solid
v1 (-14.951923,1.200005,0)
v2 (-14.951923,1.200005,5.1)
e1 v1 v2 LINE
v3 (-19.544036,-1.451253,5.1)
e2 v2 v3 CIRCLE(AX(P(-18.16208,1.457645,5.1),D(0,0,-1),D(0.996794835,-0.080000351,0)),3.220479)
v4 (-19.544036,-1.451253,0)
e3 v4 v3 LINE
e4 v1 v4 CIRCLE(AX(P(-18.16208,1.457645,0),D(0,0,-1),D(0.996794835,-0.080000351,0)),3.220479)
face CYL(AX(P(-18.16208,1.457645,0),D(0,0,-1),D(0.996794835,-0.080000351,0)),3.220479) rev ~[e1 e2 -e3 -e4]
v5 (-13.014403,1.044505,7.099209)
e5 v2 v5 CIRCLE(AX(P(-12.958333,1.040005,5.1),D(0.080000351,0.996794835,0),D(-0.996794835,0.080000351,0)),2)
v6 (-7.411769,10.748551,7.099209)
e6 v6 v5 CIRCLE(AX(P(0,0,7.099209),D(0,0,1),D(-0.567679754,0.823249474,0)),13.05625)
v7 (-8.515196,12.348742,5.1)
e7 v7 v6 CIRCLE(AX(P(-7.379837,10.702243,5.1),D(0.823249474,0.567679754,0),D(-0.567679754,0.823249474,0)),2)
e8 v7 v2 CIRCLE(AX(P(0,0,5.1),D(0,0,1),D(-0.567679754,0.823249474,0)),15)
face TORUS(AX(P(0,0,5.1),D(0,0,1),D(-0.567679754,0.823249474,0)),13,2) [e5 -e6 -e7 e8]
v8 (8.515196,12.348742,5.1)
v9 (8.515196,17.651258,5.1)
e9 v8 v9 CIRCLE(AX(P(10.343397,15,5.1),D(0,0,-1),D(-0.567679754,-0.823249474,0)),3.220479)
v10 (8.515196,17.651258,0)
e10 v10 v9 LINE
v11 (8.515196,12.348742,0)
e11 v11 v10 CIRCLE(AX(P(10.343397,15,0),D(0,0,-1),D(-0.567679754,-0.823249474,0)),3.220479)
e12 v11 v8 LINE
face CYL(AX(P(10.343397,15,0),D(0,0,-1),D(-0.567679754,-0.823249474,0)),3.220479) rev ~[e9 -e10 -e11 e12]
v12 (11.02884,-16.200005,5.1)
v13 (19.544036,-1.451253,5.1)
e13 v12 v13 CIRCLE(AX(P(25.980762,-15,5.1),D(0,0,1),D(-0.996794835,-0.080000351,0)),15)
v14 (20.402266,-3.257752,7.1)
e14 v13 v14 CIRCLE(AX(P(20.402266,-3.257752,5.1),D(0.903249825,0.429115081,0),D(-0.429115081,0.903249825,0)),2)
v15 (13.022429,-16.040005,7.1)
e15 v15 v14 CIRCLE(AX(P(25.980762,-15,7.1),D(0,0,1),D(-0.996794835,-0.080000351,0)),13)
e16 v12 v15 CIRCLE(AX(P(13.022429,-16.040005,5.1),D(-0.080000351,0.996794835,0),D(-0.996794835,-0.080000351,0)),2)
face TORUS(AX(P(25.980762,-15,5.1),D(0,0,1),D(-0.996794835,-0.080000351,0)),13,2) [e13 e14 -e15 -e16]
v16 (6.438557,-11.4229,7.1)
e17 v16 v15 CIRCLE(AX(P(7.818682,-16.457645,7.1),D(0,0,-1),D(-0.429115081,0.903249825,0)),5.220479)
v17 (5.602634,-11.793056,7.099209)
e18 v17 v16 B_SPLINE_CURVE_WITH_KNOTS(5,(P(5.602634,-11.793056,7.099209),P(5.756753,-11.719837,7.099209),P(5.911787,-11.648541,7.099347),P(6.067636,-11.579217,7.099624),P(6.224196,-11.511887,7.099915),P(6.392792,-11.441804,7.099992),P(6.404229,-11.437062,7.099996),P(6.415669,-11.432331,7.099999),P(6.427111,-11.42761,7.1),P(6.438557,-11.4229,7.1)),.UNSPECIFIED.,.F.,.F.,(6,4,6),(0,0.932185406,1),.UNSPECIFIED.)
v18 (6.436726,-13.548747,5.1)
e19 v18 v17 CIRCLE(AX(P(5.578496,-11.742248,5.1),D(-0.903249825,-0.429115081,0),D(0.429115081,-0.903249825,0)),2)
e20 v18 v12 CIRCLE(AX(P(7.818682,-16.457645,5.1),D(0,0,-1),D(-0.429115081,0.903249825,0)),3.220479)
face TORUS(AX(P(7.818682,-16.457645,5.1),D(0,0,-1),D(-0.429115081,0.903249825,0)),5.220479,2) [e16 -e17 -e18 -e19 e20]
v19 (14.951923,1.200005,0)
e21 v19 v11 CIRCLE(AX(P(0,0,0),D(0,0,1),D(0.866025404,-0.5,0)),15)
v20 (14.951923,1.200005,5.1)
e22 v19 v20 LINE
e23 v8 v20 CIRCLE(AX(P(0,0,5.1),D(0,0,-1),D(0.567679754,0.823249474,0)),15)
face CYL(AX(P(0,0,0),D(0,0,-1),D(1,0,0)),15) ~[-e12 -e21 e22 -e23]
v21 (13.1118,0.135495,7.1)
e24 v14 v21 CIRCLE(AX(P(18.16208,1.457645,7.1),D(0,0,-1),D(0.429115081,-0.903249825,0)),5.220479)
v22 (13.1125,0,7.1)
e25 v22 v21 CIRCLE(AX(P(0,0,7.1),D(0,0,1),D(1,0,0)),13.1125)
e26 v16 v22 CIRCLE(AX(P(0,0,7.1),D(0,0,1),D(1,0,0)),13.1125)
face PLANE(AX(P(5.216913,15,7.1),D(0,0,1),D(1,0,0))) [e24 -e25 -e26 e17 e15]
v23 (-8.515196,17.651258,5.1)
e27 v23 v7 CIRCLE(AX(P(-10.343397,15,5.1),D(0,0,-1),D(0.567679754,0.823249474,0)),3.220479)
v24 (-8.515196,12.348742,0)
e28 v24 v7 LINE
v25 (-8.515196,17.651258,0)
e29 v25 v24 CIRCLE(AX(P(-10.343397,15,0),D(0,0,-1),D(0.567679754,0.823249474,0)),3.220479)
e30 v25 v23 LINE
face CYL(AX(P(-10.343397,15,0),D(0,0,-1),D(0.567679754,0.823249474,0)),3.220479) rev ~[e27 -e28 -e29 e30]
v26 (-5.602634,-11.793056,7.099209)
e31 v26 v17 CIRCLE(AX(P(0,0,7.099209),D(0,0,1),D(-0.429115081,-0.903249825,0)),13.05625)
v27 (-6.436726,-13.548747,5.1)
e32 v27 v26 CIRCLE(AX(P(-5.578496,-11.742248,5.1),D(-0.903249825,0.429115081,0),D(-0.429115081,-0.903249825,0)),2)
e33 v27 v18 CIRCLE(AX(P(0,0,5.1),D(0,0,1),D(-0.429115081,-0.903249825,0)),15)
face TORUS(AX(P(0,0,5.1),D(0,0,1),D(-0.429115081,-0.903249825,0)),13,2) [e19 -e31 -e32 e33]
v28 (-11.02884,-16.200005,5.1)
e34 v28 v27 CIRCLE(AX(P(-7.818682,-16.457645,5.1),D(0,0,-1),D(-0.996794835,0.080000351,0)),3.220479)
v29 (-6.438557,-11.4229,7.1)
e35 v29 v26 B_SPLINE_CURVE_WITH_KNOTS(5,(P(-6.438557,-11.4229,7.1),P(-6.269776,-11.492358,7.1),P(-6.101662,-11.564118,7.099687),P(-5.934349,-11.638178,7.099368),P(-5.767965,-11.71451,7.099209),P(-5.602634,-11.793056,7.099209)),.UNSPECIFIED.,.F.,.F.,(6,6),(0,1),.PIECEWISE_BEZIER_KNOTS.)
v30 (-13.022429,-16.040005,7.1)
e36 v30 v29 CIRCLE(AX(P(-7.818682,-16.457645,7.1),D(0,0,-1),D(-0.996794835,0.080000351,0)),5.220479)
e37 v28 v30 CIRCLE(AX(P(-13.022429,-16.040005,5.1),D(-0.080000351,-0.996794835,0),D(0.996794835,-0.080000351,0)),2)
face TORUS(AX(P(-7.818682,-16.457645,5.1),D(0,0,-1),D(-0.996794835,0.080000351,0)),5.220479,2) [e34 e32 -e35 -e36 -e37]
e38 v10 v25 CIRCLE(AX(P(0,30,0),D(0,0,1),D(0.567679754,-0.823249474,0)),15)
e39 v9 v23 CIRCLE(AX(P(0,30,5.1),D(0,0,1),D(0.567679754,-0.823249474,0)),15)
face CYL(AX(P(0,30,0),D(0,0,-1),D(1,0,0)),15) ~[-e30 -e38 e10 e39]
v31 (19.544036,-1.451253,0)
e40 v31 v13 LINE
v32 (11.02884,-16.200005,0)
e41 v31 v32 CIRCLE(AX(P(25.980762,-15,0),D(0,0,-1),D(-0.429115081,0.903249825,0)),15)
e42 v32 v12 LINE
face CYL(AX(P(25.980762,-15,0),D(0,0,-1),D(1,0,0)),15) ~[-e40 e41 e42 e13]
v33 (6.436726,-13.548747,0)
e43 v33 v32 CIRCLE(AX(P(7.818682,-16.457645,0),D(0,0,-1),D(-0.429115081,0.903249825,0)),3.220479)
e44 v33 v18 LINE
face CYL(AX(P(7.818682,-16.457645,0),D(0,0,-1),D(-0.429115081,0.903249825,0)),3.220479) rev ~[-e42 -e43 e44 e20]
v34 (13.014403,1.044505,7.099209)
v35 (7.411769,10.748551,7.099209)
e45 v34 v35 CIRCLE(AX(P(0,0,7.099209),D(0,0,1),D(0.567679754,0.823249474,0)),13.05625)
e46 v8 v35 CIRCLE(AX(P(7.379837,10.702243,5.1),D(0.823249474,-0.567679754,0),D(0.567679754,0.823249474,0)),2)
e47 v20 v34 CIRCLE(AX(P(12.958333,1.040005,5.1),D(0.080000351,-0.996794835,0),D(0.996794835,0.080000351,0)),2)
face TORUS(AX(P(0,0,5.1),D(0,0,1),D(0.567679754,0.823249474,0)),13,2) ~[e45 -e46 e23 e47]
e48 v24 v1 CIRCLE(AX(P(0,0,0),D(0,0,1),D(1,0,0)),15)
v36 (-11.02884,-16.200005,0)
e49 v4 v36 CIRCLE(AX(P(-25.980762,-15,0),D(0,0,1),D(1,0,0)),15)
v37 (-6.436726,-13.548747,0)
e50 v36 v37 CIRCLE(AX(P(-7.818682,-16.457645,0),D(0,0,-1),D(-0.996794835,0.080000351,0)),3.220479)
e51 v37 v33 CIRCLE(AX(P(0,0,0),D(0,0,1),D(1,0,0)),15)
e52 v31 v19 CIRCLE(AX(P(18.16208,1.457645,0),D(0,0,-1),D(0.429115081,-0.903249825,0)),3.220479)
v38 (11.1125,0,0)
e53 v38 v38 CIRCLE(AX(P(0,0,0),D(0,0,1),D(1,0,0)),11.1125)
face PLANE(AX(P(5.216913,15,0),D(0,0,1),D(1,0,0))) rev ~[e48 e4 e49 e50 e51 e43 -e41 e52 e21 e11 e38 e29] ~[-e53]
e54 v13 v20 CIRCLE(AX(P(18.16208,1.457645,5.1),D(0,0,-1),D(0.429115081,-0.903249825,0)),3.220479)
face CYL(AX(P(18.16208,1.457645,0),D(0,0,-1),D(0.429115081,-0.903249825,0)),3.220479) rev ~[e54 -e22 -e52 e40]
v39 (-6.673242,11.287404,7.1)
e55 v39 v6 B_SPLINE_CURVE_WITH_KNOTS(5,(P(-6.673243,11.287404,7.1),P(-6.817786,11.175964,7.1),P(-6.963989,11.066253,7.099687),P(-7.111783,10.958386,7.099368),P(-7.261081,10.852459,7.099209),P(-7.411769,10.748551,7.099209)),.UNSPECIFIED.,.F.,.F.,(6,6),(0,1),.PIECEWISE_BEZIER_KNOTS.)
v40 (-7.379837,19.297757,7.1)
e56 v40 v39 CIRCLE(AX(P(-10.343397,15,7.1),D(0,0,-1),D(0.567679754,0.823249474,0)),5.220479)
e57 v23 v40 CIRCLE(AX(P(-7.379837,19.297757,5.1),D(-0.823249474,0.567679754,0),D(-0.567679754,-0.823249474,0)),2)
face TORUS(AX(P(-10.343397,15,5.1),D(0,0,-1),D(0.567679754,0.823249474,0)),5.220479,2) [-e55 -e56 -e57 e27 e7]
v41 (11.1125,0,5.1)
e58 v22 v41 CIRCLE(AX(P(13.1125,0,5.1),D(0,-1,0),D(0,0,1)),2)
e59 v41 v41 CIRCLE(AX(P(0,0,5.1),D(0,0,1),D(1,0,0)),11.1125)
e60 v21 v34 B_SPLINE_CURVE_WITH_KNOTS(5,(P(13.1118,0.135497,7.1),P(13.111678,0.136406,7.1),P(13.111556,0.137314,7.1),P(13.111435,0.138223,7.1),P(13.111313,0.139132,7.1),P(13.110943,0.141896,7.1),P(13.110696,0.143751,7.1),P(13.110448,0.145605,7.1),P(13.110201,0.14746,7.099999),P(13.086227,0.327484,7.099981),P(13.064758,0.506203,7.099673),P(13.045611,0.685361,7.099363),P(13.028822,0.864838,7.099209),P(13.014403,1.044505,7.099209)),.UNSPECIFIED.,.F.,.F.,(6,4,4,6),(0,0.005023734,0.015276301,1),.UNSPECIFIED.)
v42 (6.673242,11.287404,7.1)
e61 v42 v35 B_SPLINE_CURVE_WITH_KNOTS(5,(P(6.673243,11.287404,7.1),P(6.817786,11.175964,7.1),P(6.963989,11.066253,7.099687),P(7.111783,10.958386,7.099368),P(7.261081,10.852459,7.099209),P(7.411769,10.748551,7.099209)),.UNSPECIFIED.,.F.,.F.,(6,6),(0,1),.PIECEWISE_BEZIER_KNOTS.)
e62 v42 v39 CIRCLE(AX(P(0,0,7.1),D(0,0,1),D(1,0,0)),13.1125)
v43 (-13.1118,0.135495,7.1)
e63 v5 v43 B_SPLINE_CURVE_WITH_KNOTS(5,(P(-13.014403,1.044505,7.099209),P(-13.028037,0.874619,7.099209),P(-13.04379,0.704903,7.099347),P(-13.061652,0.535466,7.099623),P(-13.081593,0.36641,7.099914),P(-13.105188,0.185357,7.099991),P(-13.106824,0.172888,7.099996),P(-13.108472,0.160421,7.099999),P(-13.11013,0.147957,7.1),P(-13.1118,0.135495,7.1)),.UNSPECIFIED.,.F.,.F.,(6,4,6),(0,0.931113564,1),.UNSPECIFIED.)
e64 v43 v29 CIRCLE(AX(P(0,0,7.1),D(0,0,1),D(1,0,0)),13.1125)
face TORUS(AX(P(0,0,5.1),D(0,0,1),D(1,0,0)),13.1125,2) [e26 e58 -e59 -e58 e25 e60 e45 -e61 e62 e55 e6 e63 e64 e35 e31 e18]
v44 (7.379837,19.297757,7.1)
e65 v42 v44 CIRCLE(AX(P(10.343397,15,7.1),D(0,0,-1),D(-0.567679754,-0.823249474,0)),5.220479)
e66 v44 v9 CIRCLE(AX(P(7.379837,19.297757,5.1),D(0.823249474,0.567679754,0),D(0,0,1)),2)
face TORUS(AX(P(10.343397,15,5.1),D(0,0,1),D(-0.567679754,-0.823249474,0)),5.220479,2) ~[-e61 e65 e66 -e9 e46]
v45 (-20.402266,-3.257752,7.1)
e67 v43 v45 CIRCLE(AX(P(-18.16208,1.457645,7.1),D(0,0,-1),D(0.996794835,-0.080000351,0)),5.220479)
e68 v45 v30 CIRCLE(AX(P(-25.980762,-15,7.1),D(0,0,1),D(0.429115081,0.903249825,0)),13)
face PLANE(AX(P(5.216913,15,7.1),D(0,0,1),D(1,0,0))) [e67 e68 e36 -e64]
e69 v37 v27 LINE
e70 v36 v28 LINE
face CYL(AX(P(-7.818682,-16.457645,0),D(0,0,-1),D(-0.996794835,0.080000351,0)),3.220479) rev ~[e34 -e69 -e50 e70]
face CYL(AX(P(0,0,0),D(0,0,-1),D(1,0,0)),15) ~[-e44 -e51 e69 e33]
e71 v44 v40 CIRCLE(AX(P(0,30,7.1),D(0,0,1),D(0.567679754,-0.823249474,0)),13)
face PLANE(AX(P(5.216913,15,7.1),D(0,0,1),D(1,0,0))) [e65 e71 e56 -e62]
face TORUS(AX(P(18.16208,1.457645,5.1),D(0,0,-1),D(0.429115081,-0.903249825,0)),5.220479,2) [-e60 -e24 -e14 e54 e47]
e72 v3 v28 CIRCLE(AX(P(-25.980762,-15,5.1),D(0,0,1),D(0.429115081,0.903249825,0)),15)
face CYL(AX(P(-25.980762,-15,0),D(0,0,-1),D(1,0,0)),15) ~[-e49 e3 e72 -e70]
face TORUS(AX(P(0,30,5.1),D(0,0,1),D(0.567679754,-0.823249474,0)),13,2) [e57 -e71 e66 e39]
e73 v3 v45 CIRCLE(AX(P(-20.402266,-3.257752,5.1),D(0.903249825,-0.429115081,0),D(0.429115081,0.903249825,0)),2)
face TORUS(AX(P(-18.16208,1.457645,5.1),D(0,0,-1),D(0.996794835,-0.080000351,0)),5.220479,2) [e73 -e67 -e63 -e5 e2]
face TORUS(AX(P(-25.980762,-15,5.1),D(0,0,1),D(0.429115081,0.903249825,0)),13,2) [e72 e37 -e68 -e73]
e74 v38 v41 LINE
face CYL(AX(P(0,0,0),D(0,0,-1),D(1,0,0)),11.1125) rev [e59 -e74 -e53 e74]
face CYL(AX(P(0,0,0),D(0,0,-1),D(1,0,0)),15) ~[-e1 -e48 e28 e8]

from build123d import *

# Parameters (mm, degrees)
F0_R         = 15
F0_R_2       = 11.1125
F1_DEPTH     = 7.1
F2_R         = 15
F3_DEPTH     = 7.1
F5_DEPTH     = 7.1
F6_T2_ANGLE  = 50.822828172
F6_T4_ANGLE  = 110.822828172
F6_T6_ANGLE  = 290.822828172
F6_T8_ANGLE  = 110.822828172
F6_T10_ANGLE = 50.822828172
F6_T12_ANGLE = 110.822828172
F6_T14_ANGLE = 290.822828172
F6_T16_ANGLE = 110.822828172
F6_T18_ANGLE = 50.822828172
F6_T20_ANGLE = 110.822828172
F6_T22_ANGLE = 290.822828172
F6_T24_ANGLE = 110.822828172


# Not quite as in the source:
# - a fillet or chamfer that OpenCascade refuses, or shapes differently, is made with other operations: its cross-section is extruded or revolved along the edge and cut away or added


with BuildPart() as f1:
    # F0 (on Top) → F1 (new body)
    with BuildSketch(Plane.XY):
        Circle(F0_R)
        Circle(F0_R_2, mode=Mode.SUBTRACT)
    extrude(amount=F1_DEPTH)

    # F2 (on Top) → F3 (join)
    with BuildSketch(Plane.XY):
        with Locations((0, 30)):
            Circle(F2_R)
        with Locations((-25.9807621135, -15)):
            Circle(F2_R)
        with Locations((25.9807621135, -15)):
            Circle(F2_R)
    extrude(amount=F3_DEPTH)

    # F4 (on Top) → F5 (join)
    with BuildSketch(Plane.XY):
        with BuildLine():
            ThreePointArc((8.5151963101, 17.6512578859), (4.459196579, 15.6781437701), (-3.4e-09, 15))
            ThreePointArc((-3.4e-09, 15), (4.459196579, 14.3218562299), (8.5151963101, 12.3487421141))
            ThreePointArc((8.5151963101, 12.3487421141), (7.1229179094, 15), (8.5151963101, 17.6512578859))
        make_face()
        with BuildLine():
            ThreePointArc((-8.5151963101, 17.6512578859), (-7.1229179094, 15), (-8.5151963101, 12.3487421141))
            ThreePointArc((-8.5151963101, 12.3487421141), (-4.4591965822, 14.3218562289), (-3.4e-09, 15))
            ThreePointArc((-3.4e-09, 15), (-4.4591965822, 15.6781437711), (-8.5151963101, 17.6512578859))
        make_face()
        with BuildLine():
            ThreePointArc((-12.9903811554, -7.4999998292), (-14.632689636, -3.2991504992), (-14.9519225306, 1.2000052657))
            ThreePointArc((-14.9519225306, 1.2000052657), (-16.5518400115, -1.3313721414), (-19.544035893, -1.4512526202))
            ThreePointArc((-19.544035893, -1.4512526202), (-15.8072691523, -3.9772942992), (-12.9903811554, -7.4999998292))
        make_face()
        with BuildLine():
            ThreePointArc((-6.4367262205, -13.5487473798), (-10.1734931062, -11.0227055671), (-12.9903811554, -7.4999998292))
            ThreePointArc((-12.9903811554, -7.4999998292), (-11.3480725209, -11.7008493083), (-11.0288395829, -16.2000052657))
            ThreePointArc((-11.0288395829, -16.2000052657), (-9.4289221021, -13.6686278586), (-6.4367262205, -13.5487473798))
        make_face()
        with BuildLine():
            ThreePointArc((12.9903809901, -7.5000001155), (10.1734929847, -11.0227056792), (6.4367262205, -13.5487473798))
            ThreePointArc((6.4367262205, -13.5487473798), (9.4289221021, -13.6686278586), (11.0288395829, -16.2000052657))
            ThreePointArc((11.0288395829, -16.2000052657), (11.3480724846, -11.7008494696), (12.9903809901, -7.5000001155))
        make_face()
        with BuildLine():
            ThreePointArc((14.9519225306, 1.2000052657), (14.6326895996, -3.2991506605), (12.9903809901, -7.5000001155))
            ThreePointArc((12.9903809901, -7.5000001155), (15.8072690308, -3.9772944113), (19.544035893, -1.4512526202))
            ThreePointArc((19.544035893, -1.4512526202), (16.5518400115, -1.3313721414), (14.9519225306, 1.2000052657))
        make_face()
    extrude(amount=F5_DEPTH)

    # F6: fillet of radius 2 on 13 edges, made by hand

    # F6_s1 → F6_t2 (revolve, cut)
    with BuildSketch(Plane(origin=(0, 0, 0), x_dir=(0, 0, 1), z_dir=(-0.8232494743, 0.567679754, 0))):
        with BuildLine():
            ThreePointArc((5.1, 15), (6.5142135624, 14.4142135624), (7.1, 13))
            Line((7.1, 13), (7.1, 15))
            Line((7.1, 15), (5.1, 15))
        make_face()
    revolve(axis=Axis((0, 0, 7.1), (0, 0, -1)), revolution_arc=F6_T2_ANGLE, mode=Mode.SUBTRACT)

    # F6_s3 → F6_t4 (revolve, cut)
    with BuildSketch(Plane(origin=(0, 0, 0), x_dir=(0, 0, 1), z_dir=(0.8232494743, -0.567679754, 0))):
        with BuildLine():
            ThreePointArc((7.1, -13), (6.5142135624, -14.4142135624), (5.1, -15))
            Line((5.1, -15), (7.1, -15))
            Line((7.1, -15), (7.1, -13))
        make_face()
    revolve(axis=Axis((10.3433972036, 15, 7.1), (0, 0, -1)), revolution_arc=F6_T4_ANGLE, mode=Mode.SUBTRACT)

    # F6_s5 → F6_t6 (revolve, cut)
    with BuildSketch(Plane(origin=(14.0202617712, 9.6678090933, 0), x_dir=(0, 0, 1), z_dir=(-0.8232494743, -0.567679754, 0))):
        with BuildLine():
            ThreePointArc((5.1, 9.6974842282), (6.5142135624, 10.2832706658), (7.1, 11.6974842282))
            Line((7.1, 11.6974842282), (7.1, 9.6974842282))
            Line((7.1, 9.6974842282), (5.1, 9.6974842282))
        make_face()
    revolve(axis=Axis((0, 30, 7.1), (0, 0, 1)), revolution_arc=F6_T6_ANGLE, mode=Mode.SUBTRACT)

    # F6_s7 → F6_t8 (revolve, cut)
    with BuildSketch(Plane(origin=(-14.0202617712, 9.6678090933, 0), x_dir=(0, 0, 1), z_dir=(-0.8232494743, 0.567679754, 0))):
        with BuildLine():
            ThreePointArc((5.1, 9.6974842282), (6.5142135624, 10.2832706658), (7.1, 11.6974842282))
            Line((7.1, 11.6974842282), (7.1, 9.6974842282))
            Line((7.1, 9.6974842282), (5.1, 9.6974842282))
        make_face()
    revolve(axis=Axis((-10.3433972036, 15, 7.1), (0, 0, -1)), revolution_arc=F6_T8_ANGLE, mode=Mode.SUBTRACT)

    # F6_s9 → F6_t10 (revolve, cut)
    with BuildSketch(Plane(origin=(0, 0, 0), x_dir=(0, 0, 1), z_dir=(0.8232494743, 0.567679754, 0))):
        with BuildLine():
            ThreePointArc((5.1, -15), (6.5142135624, -14.4142135624), (7.1, -13))
            Line((7.1, -13), (7.1, -15))
            Line((7.1, -15), (5.1, -15))
        make_face()
    revolve(axis=Axis((0, 0, 7.1), (0, 0, 1)), revolution_arc=F6_T10_ANGLE, mode=Mode.SUBTRACT)

    # F6_s11 → F6_t12 (revolve, cut)
    with BuildSketch(Plane(origin=(0, 0, 0), x_dir=(0, 0, 1), z_dir=(0.080000351, 0.9967948354, 0))):
        with BuildLine():
            ThreePointArc((5.1, -15), (6.5142135624, -14.4142135624), (7.1, -13))
            Line((7.1, -13), (7.1, -15))
            Line((7.1, -15), (5.1, -15))
        make_face()
    revolve(axis=Axis((-18.1620796586, 1.4576447398, 7.1), (0, 0, -1)), revolution_arc=F6_T12_ANGLE, mode=Mode.SUBTRACT)

    # F6_s13 → F6_t14 (revolve, cut)
    with BuildSketch(Plane(origin=(-15.3826991593, 7.307998315, 0), x_dir=(0, 0, 1), z_dir=(0.9032498253, -0.4291150814, 0))):
        with BuildLine():
            ThreePointArc((5.1, 9.6974842282), (6.5142135624, 10.2832706658), (7.1, 11.6974842282))
            Line((7.1, 11.6974842282), (7.1, 9.6974842282))
            Line((7.1, 9.6974842282), (5.1, 9.6974842282))
        make_face()
    revolve(axis=Axis((-25.9807621135, -15, 7.1), (0, 0, 1)), revolution_arc=F6_T14_ANGLE, mode=Mode.SUBTRACT)

    # F6_s15 → F6_t16 (revolve, cut)
    with BuildSketch(Plane(origin=(-1.3624373881, -16.9758074082, 0), x_dir=(0, 0, 1), z_dir=(-0.080000351, -0.9967948354, 0))):
        with BuildLine():
            ThreePointArc((5.1, 9.6974842282), (6.5142135624, 10.2832706658), (7.1, 11.6974842282))
            Line((7.1, 11.6974842282), (7.1, 9.6974842282))
            Line((7.1, 9.6974842282), (5.1, 9.6974842282))
        make_face()
    revolve(axis=Axis((-7.8186824549, -16.4576447398, 7.1), (0, 0, -1)), revolution_arc=F6_T16_ANGLE, mode=Mode.SUBTRACT)

    # F6_s17 → F6_t18 (revolve, cut)
    with BuildSketch(Plane(origin=(0, 0, 0), x_dir=(0, 0, 1), z_dir=(-0.9032498253, 0.4291150814, 0))):
        with BuildLine():
            ThreePointArc((5.1, -15), (6.5142135624, -14.4142135624), (7.1, -13))
            Line((7.1, -13), (7.1, -15))
            Line((7.1, -15), (5.1, -15))
        make_face()
    revolve(axis=Axis((0, 0, 7.1), (0, 0, 1)), revolution_arc=F6_T18_ANGLE, mode=Mode.SUBTRACT)

    # F6_s19 → F6_t20 (revolve, cut)
    with BuildSketch(Plane(origin=(0, 0, 0), x_dir=(0, 0, 1), z_dir=(-0.9032498253, -0.4291150814, 0))):
        with BuildLine():
            ThreePointArc((5.1, -15), (6.5142135624, -14.4142135624), (7.1, -13))
            Line((7.1, -13), (7.1, -15))
            Line((7.1, -15), (5.1, -15))
        make_face()
    revolve(axis=Axis((7.8186824549, -16.4576447398, 7.1), (0, 0, -1)), revolution_arc=F6_T20_ANGLE, mode=Mode.SUBTRACT)

    # F6_s21 → F6_t22 (revolve, cut)
    with BuildSketch(Plane(origin=(1.3624373881, -16.9758074082, 0), x_dir=(0, 0, 1), z_dir=(-0.080000351, 0.9967948354, 0))):
        with BuildLine():
            ThreePointArc((5.1, 9.6974842282), (6.5142135624, 10.2832706658), (7.1, 11.6974842282))
            Line((7.1, 11.6974842282), (7.1, 9.6974842282))
            Line((7.1, 9.6974842282), (5.1, 9.6974842282))
        make_face()
    revolve(axis=Axis((25.9807621135, -15, 7.1), (0, 0, 1)), revolution_arc=F6_T22_ANGLE, mode=Mode.SUBTRACT)

    # F6_s23 → F6_t24 (revolve, cut)
    with BuildSketch(Plane(origin=(15.3826991593, 7.307998315, 0), x_dir=(0, 0, 1), z_dir=(0.9032498253, 0.4291150814, 0))):
        with BuildLine():
            ThreePointArc((5.1, 9.6974842282), (6.5142135624, 10.2832706658), (7.1, 11.6974842282))
            Line((7.1, 11.6974842282), (7.1, 9.6974842282))
            Line((7.1, 9.6974842282), (5.1, 9.6974842282))
        make_face()
    revolve(axis=Axis((18.1620796586, 1.4576447398, 7.1), (0, 0, -1)), revolution_arc=F6_T24_ANGLE, mode=Mode.SUBTRACT)

    # F6_s25 → F6_t26 (revolve, cut)
    with BuildSketch(Plane.XZ):
        with BuildLine():
            ThreePointArc((13.1125, 7.1), (11.6982864376, 6.5142135624), (11.1125, 5.1))
            Line((11.1125, 5.1), (11.1125, 7.1))
            Line((11.1125, 7.1), (13.1125, 7.1))
        make_face()
    revolve(axis=Axis((0, 0, 7.1), (0, 0, 1)), mode=Mode.SUBTRACT)


solid = f1.part
